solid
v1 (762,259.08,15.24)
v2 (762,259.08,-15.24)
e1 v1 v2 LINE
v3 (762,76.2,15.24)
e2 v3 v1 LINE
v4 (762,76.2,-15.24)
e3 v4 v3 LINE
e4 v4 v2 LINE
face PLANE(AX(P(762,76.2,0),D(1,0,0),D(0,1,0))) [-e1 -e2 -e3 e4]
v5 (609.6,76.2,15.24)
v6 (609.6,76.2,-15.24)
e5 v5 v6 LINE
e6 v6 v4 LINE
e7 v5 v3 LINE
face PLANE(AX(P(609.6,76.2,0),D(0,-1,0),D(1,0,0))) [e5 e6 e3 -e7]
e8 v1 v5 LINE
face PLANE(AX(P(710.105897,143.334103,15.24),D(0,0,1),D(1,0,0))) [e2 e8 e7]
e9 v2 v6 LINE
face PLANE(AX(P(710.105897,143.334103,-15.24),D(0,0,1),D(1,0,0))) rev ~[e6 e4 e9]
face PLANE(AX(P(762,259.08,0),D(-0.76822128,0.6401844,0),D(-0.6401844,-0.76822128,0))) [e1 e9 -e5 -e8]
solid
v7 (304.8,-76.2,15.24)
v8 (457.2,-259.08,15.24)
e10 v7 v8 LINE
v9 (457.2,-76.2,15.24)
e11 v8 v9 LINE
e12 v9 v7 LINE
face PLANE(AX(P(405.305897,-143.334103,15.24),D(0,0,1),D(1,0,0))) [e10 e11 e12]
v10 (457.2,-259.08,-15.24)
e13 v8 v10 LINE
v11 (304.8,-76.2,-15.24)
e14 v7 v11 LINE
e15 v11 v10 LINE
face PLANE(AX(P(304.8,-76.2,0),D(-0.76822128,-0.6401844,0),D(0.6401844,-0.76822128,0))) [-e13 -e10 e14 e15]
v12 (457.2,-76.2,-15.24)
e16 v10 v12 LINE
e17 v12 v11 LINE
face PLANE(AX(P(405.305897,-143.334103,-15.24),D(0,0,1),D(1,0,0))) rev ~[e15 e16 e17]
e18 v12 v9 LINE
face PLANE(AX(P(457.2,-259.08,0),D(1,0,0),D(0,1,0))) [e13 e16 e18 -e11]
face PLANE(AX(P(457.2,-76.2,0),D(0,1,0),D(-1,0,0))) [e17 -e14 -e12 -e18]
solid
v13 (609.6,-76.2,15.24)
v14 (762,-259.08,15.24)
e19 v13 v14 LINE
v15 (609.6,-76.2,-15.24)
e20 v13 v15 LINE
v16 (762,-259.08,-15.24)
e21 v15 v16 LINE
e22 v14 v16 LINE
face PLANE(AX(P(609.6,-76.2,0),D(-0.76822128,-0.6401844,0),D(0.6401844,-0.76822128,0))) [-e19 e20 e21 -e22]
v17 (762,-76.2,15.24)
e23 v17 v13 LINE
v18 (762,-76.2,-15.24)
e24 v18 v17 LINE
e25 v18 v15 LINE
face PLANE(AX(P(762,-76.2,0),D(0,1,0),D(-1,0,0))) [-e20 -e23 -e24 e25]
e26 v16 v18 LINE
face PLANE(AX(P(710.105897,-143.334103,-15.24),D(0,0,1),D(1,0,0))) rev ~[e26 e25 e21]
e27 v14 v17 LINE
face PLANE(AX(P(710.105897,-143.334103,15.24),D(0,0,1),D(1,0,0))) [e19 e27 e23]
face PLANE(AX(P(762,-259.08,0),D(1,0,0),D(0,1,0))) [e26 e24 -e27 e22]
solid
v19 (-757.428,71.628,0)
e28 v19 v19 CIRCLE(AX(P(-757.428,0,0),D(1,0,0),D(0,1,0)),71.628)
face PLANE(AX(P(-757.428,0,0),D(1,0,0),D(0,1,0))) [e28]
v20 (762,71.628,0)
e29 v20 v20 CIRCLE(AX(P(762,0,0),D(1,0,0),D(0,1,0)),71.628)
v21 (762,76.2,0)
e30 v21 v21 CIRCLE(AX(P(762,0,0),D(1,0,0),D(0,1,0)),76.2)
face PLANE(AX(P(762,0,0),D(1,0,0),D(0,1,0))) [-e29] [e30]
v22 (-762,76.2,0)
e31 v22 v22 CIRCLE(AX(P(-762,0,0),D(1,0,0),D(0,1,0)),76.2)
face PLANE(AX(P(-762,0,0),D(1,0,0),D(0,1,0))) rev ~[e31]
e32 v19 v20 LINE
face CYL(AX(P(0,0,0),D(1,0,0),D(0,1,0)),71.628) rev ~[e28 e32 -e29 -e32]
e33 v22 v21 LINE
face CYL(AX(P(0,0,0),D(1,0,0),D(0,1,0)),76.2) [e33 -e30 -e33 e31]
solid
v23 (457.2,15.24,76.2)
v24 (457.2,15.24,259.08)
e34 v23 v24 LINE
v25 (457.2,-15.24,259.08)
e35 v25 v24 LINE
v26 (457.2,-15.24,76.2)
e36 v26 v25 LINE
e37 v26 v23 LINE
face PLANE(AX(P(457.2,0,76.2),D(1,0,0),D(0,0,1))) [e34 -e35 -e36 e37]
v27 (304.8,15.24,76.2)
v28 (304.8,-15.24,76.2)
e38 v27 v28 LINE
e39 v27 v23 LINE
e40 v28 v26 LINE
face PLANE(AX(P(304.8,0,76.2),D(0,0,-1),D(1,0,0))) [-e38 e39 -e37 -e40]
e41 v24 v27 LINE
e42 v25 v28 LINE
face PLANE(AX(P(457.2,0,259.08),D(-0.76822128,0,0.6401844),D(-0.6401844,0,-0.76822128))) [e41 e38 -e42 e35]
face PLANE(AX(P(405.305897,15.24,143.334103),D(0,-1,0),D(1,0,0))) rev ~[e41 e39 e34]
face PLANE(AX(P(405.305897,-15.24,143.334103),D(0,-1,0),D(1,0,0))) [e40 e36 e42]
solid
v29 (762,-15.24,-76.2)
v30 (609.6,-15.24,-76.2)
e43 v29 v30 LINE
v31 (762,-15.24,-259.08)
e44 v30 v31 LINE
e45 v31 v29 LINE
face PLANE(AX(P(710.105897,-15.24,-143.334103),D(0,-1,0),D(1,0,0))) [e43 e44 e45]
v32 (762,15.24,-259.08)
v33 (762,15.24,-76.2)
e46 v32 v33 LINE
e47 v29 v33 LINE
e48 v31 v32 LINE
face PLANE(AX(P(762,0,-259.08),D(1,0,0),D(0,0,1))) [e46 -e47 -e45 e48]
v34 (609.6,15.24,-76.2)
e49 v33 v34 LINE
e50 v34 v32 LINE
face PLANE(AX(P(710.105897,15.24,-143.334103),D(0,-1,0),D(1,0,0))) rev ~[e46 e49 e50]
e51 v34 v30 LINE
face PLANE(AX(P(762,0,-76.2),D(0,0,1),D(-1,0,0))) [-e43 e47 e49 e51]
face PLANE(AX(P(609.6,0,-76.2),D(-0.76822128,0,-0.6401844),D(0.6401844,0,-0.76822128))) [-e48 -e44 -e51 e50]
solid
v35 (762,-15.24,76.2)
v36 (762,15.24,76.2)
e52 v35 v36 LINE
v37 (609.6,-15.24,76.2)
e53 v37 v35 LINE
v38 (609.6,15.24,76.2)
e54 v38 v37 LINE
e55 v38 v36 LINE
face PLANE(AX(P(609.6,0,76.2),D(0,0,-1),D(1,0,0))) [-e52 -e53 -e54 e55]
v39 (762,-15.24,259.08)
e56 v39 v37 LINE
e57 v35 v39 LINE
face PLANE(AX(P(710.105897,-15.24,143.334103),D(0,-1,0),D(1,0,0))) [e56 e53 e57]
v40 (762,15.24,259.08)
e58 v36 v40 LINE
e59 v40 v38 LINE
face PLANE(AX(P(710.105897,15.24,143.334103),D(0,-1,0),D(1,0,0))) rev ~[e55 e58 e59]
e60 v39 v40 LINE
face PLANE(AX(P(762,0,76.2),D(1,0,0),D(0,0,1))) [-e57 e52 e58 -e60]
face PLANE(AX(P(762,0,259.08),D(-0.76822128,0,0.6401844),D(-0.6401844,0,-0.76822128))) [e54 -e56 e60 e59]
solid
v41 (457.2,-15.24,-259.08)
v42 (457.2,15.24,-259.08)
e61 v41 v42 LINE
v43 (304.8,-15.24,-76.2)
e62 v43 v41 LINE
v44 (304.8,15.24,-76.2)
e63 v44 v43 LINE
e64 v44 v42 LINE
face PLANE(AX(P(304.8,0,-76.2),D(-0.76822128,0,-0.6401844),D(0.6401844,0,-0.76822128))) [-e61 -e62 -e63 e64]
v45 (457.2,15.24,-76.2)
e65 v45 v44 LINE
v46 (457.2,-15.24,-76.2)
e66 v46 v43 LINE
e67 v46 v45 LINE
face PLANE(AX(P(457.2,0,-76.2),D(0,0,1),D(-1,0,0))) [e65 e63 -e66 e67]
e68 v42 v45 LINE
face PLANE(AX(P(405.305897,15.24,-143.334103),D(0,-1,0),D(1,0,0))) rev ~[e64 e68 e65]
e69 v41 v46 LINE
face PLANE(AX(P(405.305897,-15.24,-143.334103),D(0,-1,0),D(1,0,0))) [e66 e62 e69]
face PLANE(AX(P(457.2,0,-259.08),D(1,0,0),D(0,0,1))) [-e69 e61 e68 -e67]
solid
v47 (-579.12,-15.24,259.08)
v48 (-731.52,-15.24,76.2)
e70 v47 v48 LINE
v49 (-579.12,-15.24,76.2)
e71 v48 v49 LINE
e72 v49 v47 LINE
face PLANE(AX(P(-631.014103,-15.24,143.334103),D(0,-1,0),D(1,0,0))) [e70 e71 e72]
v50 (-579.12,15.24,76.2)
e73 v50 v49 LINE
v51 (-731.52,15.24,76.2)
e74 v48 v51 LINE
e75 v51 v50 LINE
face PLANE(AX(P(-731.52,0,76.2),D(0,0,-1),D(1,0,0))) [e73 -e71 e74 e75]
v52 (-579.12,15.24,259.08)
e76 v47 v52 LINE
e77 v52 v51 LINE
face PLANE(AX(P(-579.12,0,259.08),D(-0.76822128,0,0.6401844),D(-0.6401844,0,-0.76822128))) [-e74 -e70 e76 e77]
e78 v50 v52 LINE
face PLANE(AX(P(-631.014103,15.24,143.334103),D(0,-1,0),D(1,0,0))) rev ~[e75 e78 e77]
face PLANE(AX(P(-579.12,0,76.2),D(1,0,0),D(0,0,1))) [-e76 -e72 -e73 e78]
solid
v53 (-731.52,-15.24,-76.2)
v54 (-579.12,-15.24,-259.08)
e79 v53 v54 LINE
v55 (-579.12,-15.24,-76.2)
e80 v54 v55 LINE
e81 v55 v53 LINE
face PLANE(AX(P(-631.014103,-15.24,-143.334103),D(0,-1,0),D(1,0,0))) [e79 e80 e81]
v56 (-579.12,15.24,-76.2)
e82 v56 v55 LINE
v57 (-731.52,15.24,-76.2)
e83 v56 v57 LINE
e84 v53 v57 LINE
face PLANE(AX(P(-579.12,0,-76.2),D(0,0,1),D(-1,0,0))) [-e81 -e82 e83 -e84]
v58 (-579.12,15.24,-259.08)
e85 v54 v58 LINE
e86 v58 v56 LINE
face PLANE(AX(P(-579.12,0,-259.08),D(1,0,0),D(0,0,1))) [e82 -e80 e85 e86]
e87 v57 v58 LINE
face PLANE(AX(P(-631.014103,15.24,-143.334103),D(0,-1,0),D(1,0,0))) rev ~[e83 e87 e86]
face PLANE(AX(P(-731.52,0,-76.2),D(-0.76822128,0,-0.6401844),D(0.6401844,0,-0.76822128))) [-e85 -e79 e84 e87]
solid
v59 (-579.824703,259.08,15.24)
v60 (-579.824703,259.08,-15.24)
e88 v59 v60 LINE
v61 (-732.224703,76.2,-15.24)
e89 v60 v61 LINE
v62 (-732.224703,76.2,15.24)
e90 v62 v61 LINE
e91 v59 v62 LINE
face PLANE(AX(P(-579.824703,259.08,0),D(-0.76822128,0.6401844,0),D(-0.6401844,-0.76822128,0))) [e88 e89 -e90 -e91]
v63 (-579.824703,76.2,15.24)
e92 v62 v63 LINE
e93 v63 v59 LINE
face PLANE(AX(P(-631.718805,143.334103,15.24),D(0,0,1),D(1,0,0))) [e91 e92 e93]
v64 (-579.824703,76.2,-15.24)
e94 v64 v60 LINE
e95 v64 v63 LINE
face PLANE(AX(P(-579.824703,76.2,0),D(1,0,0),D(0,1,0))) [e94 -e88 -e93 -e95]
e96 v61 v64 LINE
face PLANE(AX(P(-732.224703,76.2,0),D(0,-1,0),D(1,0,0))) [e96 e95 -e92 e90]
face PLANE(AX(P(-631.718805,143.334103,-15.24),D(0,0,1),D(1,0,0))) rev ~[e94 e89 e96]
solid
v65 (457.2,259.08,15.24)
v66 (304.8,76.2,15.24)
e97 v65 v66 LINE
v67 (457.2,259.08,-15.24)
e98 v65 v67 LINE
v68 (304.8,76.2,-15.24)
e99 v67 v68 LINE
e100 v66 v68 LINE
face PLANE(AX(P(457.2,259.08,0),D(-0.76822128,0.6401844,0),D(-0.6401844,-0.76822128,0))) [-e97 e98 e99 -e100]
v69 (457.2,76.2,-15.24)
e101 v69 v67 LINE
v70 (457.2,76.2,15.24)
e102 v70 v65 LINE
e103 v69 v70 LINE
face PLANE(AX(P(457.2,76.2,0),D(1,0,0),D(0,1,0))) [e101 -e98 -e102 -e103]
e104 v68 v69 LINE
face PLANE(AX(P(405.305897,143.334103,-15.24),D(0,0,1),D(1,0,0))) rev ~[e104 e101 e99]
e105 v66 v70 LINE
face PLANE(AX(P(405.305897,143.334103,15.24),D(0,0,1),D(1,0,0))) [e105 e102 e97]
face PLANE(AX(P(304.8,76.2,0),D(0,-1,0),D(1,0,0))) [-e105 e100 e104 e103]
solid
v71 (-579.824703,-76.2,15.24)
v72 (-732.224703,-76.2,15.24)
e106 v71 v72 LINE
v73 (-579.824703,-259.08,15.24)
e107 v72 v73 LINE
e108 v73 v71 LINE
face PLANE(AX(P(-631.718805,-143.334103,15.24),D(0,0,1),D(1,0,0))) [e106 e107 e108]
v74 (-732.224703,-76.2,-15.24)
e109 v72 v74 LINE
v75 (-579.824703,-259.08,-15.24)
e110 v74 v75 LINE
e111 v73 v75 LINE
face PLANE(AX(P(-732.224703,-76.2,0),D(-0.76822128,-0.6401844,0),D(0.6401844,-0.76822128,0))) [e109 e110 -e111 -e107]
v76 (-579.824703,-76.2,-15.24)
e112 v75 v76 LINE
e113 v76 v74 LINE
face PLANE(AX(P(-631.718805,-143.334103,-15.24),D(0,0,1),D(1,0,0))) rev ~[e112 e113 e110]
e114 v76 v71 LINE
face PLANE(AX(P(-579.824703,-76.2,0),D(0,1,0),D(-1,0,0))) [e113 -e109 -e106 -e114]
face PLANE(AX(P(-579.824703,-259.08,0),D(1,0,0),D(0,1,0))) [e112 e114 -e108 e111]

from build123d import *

# Parameters (mm, degrees)
F1_R          = 76.2
F2_DEPTH      = 762
F2_DEPTH_BACK = 762
F4_DEPTH      = 15.24
F4_DEPTH_BACK = 15.24
F6_DEPTH      = 15.24
F6_DEPTH_BACK = 15.24
F7_T          = -4.572


# Not quite as in the source:
# - the program builds the solid bodies; features that only make, move or delete a surface that nothing else refers to are left out


with BuildPart() as f2:
    # F1 (on Right) → F2 (new body, two sides)
    with BuildSketch(Plane.YZ) as f2_sk:
        Circle(F1_R)
    extrude(amount=F2_DEPTH)
    extrude(f2_sk.sketch, amount=-F2_DEPTH_BACK)

    # F7
    f7_openings = [f2.faces().sort_by_distance(p)[0] for p in [
        (762, 0, 0),
    ]]
    offset(amount=F7_T, openings=f7_openings)


with BuildPart() as f4:
    # F0 (on Top) → F4 (new body, two sides)
    with BuildSketch(Plane.XY) as f4_sk:
        Polygon((-732.2247028351, 76.2), (-579.8247028351, 76.2), (-579.8247028351, 259.08), align=None)
    extrude(amount=F4_DEPTH)
    extrude(f4_sk.sketch, amount=-F4_DEPTH_BACK)


with BuildPart() as f4b:
    # F0 (on Top) → F4, piece 2 (new body, two sides)
    with BuildSketch(Plane.XY) as f4_2_sk:
        Polygon((-579.8247028351, -259.08), (-579.8247028351, -76.2), (-732.2247028351, -76.2), align=None)
    extrude(amount=F4_DEPTH)
    extrude(f4_2_sk.sketch, amount=-F4_DEPTH_BACK)


with BuildPart() as f4c:
    # F0 (on Top) → F4, piece 3 (new body, two sides)
    with BuildSketch(Plane.XY) as f4_3_sk:
        Polygon((457.2, -259.08), (457.2, -76.2), (304.8, -76.2), align=None)
    extrude(amount=F4_DEPTH)
    extrude(f4_3_sk.sketch, amount=-F4_DEPTH_BACK)


with BuildPart() as f4d:
    # F0 (on Top) → F4, piece 4 (new body, two sides)
    with BuildSketch(Plane.XY) as f4_4_sk:
        Polygon((304.8, 76.2), (457.2, 76.2), (457.2, 259.08), align=None)
    extrude(amount=F4_DEPTH)
    extrude(f4_4_sk.sketch, amount=-F4_DEPTH_BACK)


with BuildPart() as f4e:
    # F0 (on Top) → F4, piece 5 (new body, two sides)
    with BuildSketch(Plane.XY) as f4_5_sk:
        Polygon((609.6, 76.2), (762, 76.2), (762, 259.08), align=None)
    extrude(amount=F4_DEPTH)
    extrude(f4_5_sk.sketch, amount=-F4_DEPTH_BACK)


with BuildPart() as f4f:
    # F0 (on Top) → F4, piece 6 (new body, two sides)
    with BuildSketch(Plane.XY) as f4_6_sk:
        Polygon((762, -259.08), (762, -76.2), (609.6, -76.2), align=None)
    extrude(amount=F4_DEPTH)
    extrude(f4_6_sk.sketch, amount=-F4_DEPTH_BACK)


with BuildPart() as f6:
    # F5 (on Front) → F6 (new body, two sides)
    with BuildSketch(Plane.XZ) as f6_sk:
        Polygon((762, -76.2), (609.6, -76.2), (762, -259.08), align=None)
    extrude(amount=F6_DEPTH)
    extrude(f6_sk.sketch, amount=-F6_DEPTH_BACK)


with BuildPart() as f6b:
    # F5 (on Front) → F6, piece 2 (new body, two sides)
    with BuildSketch(Plane.XZ) as f6_2_sk:
        Polygon((762, 259.08), (609.6, 76.2), (762, 76.2), align=None)
    extrude(amount=F6_DEPTH)
    extrude(f6_2_sk.sketch, amount=-F6_DEPTH_BACK)


with BuildPart() as f6c:
    # F5 (on Front) → F6, piece 3 (new body, two sides)
    with BuildSketch(Plane.XZ) as f6_3_sk:
        Polygon((457.2, -76.2), (304.8, -76.2), (457.2, -259.08), align=None)
    extrude(amount=F6_DEPTH)
    extrude(f6_3_sk.sketch, amount=-F6_DEPTH_BACK)


with BuildPart() as f6d:
    # F5 (on Front) → F6, piece 4 (new body, two sides)
    with BuildSketch(Plane.XZ) as f6_4_sk:
        Polygon((457.2, 259.08), (304.8, 76.2), (457.2, 76.2), align=None)
    extrude(amount=F6_DEPTH)
    extrude(f6_4_sk.sketch, amount=-F6_DEPTH_BACK)


with BuildPart() as f6e:
    # F5 (on Front) → F6, piece 5 (new body, two sides)
    with BuildSketch(Plane.XZ) as f6_5_sk:
        Polygon((-731.52, 76.2), (-579.12, 76.2), (-579.12, 259.08), align=None)
    extrude(amount=F6_DEPTH)
    extrude(f6_5_sk.sketch, amount=-F6_DEPTH_BACK)


with BuildPart() as f6f:
    # F5 (on Front) → F6, piece 6 (new body, two sides)
    with BuildSketch(Plane.XZ) as f6_6_sk:
        Polygon((-579.12, -259.08), (-579.12, -76.2), (-731.52, -76.2), align=None)
    extrude(amount=F6_DEPTH)
    extrude(f6_6_sk.sketch, amount=-F6_DEPTH_BACK)


solid = Compound([f2.part, f4.part, f4b.part, f4c.part, f4d.part, f4e.part, f4f.part, f6.part, f6b.part, f6c.part, f6d.part, f6e.part, f6f.part])
